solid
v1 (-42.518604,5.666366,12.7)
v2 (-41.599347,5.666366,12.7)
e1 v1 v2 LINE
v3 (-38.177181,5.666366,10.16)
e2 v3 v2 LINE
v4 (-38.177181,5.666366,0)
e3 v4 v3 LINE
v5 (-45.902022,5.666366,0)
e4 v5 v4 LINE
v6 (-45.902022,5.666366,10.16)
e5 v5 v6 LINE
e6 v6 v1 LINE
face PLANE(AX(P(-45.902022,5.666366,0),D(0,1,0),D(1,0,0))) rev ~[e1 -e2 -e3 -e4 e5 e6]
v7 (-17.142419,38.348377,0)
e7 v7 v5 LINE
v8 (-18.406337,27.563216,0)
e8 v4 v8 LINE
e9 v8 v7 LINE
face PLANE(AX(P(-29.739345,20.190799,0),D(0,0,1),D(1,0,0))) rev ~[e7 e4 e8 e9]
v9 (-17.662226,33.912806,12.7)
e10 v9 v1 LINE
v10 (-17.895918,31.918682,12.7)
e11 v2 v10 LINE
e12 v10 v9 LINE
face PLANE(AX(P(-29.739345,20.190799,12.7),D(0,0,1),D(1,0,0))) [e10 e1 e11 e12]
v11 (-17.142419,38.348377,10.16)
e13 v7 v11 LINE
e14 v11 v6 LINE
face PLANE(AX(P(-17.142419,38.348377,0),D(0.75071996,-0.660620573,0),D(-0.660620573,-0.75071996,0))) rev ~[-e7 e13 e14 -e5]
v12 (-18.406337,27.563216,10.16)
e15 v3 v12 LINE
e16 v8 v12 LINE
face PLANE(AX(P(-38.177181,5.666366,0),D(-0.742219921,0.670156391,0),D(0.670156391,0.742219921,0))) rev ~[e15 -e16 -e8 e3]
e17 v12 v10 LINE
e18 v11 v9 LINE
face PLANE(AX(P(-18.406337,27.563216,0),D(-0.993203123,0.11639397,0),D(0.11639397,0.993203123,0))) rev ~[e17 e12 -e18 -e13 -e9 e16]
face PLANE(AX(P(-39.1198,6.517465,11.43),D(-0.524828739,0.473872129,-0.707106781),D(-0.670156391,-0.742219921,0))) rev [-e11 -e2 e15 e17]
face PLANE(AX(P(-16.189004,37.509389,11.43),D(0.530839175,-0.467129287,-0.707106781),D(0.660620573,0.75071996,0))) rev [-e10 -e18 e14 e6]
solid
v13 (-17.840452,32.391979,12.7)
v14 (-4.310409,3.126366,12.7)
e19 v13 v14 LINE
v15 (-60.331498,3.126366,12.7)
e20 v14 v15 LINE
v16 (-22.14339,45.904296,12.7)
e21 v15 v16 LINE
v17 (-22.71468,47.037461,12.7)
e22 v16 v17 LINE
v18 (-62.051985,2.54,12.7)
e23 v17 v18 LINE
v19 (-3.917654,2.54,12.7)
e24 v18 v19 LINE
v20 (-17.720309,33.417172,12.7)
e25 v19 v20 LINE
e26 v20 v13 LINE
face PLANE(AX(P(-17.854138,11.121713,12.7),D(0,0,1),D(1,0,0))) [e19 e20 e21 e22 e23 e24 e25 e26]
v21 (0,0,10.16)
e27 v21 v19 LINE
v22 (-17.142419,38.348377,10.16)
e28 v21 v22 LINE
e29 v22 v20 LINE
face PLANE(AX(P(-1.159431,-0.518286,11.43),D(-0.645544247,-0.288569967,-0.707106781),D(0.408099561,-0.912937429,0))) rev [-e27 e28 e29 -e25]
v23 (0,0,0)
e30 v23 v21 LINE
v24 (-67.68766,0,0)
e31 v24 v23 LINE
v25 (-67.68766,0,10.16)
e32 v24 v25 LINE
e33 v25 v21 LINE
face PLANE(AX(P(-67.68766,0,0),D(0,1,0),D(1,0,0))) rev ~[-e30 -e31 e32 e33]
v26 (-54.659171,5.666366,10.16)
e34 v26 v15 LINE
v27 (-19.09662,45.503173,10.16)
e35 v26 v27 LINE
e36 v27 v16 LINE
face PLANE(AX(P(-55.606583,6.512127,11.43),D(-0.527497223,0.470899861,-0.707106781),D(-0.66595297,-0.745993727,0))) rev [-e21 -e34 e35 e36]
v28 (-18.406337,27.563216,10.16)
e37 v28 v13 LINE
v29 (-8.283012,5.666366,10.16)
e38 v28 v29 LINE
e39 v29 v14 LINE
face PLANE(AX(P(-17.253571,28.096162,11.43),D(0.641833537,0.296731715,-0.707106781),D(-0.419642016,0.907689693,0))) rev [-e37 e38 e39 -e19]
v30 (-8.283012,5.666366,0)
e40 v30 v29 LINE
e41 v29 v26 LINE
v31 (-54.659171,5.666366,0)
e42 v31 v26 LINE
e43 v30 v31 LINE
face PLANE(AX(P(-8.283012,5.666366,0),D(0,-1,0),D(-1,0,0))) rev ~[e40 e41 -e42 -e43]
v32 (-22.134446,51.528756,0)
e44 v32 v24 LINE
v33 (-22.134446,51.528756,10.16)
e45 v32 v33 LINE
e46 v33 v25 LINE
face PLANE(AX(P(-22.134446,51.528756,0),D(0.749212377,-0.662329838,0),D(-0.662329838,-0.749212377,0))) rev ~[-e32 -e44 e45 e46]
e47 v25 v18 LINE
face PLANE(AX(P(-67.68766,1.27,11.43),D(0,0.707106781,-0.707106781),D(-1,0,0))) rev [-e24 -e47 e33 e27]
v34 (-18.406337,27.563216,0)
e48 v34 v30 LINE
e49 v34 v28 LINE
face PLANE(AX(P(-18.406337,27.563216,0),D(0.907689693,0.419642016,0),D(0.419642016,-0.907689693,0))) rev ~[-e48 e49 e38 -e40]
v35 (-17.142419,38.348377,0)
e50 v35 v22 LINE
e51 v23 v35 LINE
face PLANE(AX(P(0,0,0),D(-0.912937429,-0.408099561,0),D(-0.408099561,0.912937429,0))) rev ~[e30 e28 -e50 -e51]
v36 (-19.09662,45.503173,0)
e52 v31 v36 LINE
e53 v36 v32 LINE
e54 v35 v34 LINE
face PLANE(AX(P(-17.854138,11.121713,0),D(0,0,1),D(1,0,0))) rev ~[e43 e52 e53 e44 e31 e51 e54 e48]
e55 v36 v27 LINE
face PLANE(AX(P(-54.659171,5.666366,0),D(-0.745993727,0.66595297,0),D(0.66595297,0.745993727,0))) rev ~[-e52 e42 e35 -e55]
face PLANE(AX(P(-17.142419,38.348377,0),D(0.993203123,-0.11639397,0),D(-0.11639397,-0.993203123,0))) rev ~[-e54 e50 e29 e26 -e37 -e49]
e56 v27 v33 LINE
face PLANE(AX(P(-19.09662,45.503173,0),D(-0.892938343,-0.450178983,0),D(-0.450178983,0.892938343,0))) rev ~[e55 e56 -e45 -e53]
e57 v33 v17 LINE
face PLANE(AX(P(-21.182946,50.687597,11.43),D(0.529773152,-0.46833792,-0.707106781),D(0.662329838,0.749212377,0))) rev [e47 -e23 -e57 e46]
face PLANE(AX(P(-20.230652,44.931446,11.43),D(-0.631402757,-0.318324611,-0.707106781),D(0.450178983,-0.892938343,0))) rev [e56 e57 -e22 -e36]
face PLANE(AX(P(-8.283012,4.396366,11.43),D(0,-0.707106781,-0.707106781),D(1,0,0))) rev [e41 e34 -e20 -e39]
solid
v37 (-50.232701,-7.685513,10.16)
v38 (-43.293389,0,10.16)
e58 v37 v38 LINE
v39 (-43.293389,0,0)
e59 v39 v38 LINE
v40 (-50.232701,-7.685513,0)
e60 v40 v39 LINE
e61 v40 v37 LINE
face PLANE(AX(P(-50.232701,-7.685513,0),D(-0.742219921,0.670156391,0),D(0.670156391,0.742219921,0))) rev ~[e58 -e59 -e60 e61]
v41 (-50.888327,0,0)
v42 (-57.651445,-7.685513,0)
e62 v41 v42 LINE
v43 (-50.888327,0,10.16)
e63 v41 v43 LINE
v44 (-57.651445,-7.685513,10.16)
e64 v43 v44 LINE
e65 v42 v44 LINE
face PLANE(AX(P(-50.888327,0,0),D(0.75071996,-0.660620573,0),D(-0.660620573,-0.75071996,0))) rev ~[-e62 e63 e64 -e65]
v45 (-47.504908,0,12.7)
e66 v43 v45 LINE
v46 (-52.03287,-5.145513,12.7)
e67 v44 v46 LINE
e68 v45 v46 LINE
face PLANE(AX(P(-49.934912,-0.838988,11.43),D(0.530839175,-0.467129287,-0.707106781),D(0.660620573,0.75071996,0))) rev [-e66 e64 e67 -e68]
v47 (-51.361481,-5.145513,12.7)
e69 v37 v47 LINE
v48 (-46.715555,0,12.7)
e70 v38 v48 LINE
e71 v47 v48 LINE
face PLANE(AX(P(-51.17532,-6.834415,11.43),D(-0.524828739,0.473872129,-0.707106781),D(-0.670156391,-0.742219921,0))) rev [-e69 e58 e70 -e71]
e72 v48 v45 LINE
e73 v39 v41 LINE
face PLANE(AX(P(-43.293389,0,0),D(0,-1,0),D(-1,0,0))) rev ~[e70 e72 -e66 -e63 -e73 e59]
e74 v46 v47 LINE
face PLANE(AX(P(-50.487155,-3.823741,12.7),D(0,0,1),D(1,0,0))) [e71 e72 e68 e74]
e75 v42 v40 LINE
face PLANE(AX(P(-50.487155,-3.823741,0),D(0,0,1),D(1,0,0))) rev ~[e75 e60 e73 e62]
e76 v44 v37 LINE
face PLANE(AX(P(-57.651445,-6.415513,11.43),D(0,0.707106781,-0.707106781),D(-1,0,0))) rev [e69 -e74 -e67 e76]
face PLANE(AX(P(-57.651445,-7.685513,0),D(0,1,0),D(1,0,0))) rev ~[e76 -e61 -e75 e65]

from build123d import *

# Parameters (mm, degrees)
F1_DEPTH  = 12.7
F2_DEPTH  = 12.7
F3_SIZE   = 2.54
F3_2_SIZE = 2.54
F3_3_SIZE = 2.54


with BuildPart() as f1:
    # F0 (on Top) → F1 (new body)
    with BuildSketch(Plane.XY):
        Polygon((-17.142418772, 38.3483767509), (-45.9020223429, 5.6663663127), (-38.1771805871, 5.6663663127), (-18.4063371271, 27.5632161647), align=None)
    extrude(amount=F1_DEPTH)

    # F3#2
    f3_2_edges = [f1.edges().sort_by_distance(p)[0] for p in [
        (-28.291759, 16.614791, 12.7),
        (-31.522221, 22.007372, 12.7),
    ]]
    chamfer(f3_2_edges, length=F3_2_SIZE)


with BuildPart() as f1b:
    # F0 (on Top) → F1, piece 2 (new body)
    with BuildSketch(Plane.XY):
        Polygon((-43.2933887226, 0), (-50.8883266324, 0), (-57.6514452696, -7.6855132356), (-50.2327010036, -7.6855132356), align=None)
    extrude(amount=F1_DEPTH)

    # F3#3
    f3_3_edges = [f1b.edges().sort_by_distance(p)[0] for p in [
        (-46.763045, -3.842757, 12.7),
        (-54.269886, -3.842757, 12.7),
        (-53.942073, -7.685513, 12.7),
    ]]
    chamfer(f3_3_edges, length=F3_3_SIZE)


with BuildPart() as f2:
    # F0 (on Top) → F2 (new body)
    with BuildSketch(Plane.XY):
        Polygon((0, 0), (-17.142418772, 38.3483767509), (-18.4063371271, 27.5632161647), (-8.2830116153, 5.6663663127), (-38.1771805871, 5.6663663127), (-43.2933887226, 0), align=None)
        Polygon((-38.1771805871, 5.6663663127), (-45.9020223429, 5.6663663127), (-50.8883266324, 0), (-43.2933887226, 0), align=None)
        Polygon((-54.6591710989, 5.6663663127), (-19.0966203809, 45.5031730235), (-22.1344456077, 51.5287555754), (-67.6876604557, 0), (-59.7175695002, 0), (-50.8883266324, 0), (-45.9020223429, 5.6663663127), align=None)
    extrude(amount=F2_DEPTH)

    # F3
    f3_edges = [f2.edges().sort_by_distance(p)[0] for p in [
        (-33.84383, 0, 12.7),
        (-31.471091, 5.666366, 12.7),
        (-13.344674, 16.614791, 12.7),
        (-8.571209, 19.174188, 12.7),
        (-44.911053, 25.764378, 12.7),
        (-36.877896, 25.58477, 12.7),
        (-20.615533, 48.515964, 12.7),
    ]]
    chamfer(f3_edges, length=F3_SIZE)


solid = Compound([f1.part, f1b.part, f2.part])
